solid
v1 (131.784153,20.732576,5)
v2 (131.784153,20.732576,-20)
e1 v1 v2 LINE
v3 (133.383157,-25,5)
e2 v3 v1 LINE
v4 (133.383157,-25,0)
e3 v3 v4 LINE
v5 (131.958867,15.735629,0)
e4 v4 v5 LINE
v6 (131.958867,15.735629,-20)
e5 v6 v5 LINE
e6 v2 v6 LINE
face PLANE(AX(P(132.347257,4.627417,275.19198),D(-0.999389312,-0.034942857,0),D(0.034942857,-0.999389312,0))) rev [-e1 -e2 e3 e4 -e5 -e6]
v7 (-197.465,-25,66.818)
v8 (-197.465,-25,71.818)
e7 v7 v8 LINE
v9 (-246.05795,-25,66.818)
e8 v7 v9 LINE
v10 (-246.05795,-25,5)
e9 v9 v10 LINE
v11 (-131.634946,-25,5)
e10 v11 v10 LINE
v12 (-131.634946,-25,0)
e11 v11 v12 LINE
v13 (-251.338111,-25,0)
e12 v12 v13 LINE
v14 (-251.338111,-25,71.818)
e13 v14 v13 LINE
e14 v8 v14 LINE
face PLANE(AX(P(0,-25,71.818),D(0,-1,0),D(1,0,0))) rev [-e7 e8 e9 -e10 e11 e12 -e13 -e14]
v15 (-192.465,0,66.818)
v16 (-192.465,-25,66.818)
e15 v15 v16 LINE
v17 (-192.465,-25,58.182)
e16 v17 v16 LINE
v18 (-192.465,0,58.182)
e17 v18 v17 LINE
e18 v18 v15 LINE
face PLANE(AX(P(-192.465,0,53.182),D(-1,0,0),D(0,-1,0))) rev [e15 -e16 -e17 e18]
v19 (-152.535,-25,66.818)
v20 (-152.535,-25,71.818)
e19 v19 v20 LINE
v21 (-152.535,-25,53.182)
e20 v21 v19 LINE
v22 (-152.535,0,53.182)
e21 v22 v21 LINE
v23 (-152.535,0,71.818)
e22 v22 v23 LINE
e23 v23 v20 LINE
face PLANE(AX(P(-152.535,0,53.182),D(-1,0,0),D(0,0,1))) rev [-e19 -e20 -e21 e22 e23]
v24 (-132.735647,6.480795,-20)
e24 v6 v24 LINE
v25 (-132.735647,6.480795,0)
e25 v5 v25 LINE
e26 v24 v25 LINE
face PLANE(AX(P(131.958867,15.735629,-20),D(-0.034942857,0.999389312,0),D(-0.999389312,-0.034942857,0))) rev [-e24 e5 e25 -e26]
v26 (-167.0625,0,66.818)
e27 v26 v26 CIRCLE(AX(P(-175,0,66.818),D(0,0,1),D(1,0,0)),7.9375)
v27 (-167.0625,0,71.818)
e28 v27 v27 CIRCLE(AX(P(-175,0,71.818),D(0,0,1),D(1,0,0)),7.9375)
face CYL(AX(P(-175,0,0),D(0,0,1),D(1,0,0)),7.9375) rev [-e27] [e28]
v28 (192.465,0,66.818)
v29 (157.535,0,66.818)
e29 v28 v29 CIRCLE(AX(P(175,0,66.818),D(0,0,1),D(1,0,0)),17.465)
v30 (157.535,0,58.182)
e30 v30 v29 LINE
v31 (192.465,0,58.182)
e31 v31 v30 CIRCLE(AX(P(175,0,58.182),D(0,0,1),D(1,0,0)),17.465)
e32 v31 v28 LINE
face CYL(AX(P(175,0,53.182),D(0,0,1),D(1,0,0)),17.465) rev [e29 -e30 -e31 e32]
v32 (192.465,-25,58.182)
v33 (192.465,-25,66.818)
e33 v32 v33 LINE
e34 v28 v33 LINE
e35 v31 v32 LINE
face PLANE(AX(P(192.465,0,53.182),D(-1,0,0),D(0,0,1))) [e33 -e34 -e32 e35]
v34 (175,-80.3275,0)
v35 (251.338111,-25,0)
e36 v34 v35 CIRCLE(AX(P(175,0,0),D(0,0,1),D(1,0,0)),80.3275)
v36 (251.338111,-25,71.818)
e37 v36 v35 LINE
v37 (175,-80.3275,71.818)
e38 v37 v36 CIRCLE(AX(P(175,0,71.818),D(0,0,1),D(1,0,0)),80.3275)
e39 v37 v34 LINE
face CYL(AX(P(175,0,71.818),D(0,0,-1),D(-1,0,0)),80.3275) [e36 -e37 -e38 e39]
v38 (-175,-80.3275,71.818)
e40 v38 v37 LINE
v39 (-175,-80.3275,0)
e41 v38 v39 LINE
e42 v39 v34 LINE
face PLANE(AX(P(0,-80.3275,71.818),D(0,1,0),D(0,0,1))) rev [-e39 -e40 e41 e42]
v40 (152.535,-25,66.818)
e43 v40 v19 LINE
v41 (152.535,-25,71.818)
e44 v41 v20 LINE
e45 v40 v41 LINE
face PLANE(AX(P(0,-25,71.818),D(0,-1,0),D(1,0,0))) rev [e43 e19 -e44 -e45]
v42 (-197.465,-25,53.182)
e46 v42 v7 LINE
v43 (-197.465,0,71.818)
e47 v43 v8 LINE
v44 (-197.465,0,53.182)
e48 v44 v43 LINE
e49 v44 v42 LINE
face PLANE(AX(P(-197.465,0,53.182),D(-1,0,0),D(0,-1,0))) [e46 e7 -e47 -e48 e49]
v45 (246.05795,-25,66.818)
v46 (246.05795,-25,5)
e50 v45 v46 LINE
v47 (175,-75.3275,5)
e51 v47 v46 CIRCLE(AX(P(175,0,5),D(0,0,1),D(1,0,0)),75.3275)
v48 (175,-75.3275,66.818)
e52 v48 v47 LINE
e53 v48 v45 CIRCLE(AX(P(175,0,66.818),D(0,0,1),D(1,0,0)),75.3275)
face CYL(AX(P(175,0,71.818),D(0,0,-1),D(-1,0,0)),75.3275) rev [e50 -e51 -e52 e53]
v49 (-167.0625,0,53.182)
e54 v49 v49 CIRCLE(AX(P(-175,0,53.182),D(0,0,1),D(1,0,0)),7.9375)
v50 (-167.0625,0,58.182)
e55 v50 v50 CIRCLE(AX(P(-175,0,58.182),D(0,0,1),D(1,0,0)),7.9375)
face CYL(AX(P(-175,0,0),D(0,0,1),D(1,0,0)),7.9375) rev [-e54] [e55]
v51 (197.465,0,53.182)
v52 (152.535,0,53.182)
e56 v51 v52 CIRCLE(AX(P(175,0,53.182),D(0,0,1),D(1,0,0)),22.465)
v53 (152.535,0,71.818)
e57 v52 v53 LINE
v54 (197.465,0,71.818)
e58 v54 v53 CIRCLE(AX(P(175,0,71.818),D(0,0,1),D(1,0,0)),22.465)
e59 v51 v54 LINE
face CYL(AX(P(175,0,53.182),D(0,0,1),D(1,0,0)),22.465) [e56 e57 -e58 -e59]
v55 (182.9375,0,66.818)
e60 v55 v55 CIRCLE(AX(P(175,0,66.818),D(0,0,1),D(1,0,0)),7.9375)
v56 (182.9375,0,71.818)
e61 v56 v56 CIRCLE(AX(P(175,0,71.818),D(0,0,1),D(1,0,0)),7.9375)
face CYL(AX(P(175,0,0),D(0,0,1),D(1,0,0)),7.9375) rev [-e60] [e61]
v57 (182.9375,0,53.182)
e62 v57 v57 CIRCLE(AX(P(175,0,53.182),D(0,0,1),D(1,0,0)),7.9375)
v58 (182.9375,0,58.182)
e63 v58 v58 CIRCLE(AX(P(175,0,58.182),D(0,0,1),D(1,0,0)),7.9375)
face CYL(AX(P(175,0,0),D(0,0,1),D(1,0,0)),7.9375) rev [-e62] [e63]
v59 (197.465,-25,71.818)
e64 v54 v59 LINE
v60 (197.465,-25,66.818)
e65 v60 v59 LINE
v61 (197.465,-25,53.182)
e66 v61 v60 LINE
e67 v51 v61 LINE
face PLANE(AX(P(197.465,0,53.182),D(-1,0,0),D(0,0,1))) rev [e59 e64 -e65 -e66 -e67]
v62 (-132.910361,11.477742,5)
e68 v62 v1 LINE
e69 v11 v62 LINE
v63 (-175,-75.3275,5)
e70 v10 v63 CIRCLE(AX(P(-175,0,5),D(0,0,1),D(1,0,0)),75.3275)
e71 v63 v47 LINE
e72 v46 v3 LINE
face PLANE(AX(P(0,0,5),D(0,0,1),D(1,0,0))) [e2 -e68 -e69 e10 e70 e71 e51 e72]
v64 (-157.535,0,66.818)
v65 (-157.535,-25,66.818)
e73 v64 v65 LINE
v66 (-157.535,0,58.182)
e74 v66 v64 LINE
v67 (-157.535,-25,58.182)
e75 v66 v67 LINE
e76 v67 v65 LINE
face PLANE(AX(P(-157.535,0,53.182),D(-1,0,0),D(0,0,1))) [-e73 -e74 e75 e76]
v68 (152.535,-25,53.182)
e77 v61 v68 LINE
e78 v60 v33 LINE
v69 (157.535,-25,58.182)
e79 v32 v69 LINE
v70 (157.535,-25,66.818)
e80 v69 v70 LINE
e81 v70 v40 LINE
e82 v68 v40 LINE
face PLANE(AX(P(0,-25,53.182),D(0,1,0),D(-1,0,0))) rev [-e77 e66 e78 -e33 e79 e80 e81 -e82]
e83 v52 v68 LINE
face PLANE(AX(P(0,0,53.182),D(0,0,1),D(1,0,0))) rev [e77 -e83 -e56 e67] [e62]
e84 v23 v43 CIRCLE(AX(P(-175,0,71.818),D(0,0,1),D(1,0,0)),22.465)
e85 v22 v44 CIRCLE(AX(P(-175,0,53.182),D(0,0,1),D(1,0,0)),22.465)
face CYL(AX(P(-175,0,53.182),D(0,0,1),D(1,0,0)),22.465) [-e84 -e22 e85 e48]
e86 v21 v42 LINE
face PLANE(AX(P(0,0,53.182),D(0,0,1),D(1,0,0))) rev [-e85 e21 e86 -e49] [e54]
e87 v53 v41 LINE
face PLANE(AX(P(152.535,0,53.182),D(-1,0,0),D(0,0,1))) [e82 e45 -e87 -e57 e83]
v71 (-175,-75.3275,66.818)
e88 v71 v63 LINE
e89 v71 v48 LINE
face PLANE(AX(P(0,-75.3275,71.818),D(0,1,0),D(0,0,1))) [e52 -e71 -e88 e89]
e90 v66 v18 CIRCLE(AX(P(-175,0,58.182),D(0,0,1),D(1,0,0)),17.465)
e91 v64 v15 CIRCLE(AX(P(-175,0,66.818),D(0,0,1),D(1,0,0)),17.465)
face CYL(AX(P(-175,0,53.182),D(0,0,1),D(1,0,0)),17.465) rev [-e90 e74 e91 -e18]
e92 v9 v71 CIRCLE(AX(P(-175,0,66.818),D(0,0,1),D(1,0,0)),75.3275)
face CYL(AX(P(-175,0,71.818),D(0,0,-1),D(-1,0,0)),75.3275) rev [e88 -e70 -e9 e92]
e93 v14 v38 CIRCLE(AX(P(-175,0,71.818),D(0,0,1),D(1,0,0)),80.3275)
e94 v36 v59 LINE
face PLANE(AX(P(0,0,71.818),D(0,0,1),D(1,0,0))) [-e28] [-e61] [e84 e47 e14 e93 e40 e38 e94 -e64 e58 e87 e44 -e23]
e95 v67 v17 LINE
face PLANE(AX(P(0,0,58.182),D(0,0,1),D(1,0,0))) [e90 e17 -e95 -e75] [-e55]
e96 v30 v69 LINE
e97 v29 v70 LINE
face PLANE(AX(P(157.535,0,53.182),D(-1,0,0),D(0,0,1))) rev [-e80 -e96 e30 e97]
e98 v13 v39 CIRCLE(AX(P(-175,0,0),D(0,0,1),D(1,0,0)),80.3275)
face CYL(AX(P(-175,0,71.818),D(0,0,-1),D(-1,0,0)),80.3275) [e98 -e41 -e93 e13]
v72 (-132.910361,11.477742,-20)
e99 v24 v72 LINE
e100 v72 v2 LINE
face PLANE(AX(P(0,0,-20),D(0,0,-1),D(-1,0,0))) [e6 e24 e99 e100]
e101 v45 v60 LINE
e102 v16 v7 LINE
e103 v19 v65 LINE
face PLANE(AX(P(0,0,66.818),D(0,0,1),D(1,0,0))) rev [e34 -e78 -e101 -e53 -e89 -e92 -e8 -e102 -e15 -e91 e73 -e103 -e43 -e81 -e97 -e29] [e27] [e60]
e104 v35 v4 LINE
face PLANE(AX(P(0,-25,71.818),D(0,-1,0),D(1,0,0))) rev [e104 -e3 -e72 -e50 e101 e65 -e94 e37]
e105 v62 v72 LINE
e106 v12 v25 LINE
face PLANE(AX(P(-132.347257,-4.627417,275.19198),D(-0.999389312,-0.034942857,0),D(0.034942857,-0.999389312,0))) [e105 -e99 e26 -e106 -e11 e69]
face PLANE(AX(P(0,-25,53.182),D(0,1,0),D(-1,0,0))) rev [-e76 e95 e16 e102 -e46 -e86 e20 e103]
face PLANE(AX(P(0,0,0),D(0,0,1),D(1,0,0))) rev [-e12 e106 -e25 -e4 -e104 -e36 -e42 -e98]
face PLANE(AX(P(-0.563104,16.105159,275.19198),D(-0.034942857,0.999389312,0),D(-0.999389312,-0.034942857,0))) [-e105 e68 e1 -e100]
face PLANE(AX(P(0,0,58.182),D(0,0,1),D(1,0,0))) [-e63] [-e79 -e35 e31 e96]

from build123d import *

# Parameters (mm, degrees)
BOSS_EXTRUDE7_DEPTH = 71.818
SHELL8_START        = 5
SHELL8_DEPTH        = 61.818
BOSS_EXTRUDE4_DEPTH = 18.636
SHELL7_START        = 58.182
SHELL7_DEPTH        = 8.636
SKETCH5_R           = 7.9375
CUT_EXTRUDE1_DEPTH  = 274.461475598
BOSS_EXTRUDE5_DEPTH = 5
BOSS_EXTRUDE6_DEPTH = 20


# Read off the part's stored shape, not the designer's step: Shell8, Shell7
with BuildPart() as part:
    # Sketch3 → Boss-Extrude7 (new body)
    with BuildSketch(Plane.XY):
        with BuildLine():
            ThreePointArc((-251.338111427, -25), (-222.139790815, -65.041120671), (-175, -80.3275))
            Line((-175, -80.3275), (175, -80.3275))
            ThreePointArc((175, -80.3275), (222.139790815, -65.041120671), (251.338111427, -25))
            Line((251.338111427, -25), (-251.338111427, -25))
        make_face()
    extrude(amount=BOSS_EXTRUDE7_DEPTH)

    # Shell8 outline → Shell8 (cut)
    with BuildSketch(Plane.XY.offset(SHELL8_START)):
        with BuildLine():
            ThreePointArc((-246.057949986, -25), (-218.537597294, -61.471211783), (-175, -75.3275))
            Line((-175, -75.3275), (175, -75.3275))
            ThreePointArc((175, -75.3275), (218.537597294, -61.471211783), (246.057949986, -25))
            Line((246.057949986, -25), (-246.057949986, -25))
        make_face()
    extrude(amount=SHELL8_DEPTH, mode=Mode.SUBTRACT)

    # Sketch4 → Boss-Extrude4 (add)
    with BuildSketch(Plane.XY.offset(71.818)):
        with BuildLine():
            Line((152.535, -25), (197.465, -25))
            Line((197.465, -25), (197.465, 0))
            ThreePointArc((197.465, 0), (175, 22.465), (152.535, 0))
            Line((152.535, 0), (152.535, -25))
        make_face()
        with BuildLine():
            Line((-197.465, 0), (-197.465, -25))
            Line((-197.465, -25), (-152.535, -25))
            Line((-152.535, -25), (-152.535, 0))
            ThreePointArc((-152.535, 0), (-175, 22.465), (-197.465, 0))
        make_face()
    extrude(amount=-BOSS_EXTRUDE4_DEPTH)

    # Shell7 outline → Shell7 (cut)
    with BuildSketch(Plane.XY.offset(SHELL7_START)):
        with BuildLine():
            Line((192.465, -25), (192.465, 0))
            ThreePointArc((192.465, 0), (175, 17.465), (157.535, 0))
            Line((157.535, 0), (157.535, -25))
            Line((157.535, -25), (192.465, -25))
        make_face()
        with BuildLine():
            ThreePointArc((-157.535, 0), (-175, 17.465), (-192.465, 0))
            Line((-192.465, 0), (-192.465, -25))
            Line((-192.465, -25), (-157.535, -25))
            Line((-157.535, -25), (-157.535, 0))
        make_face()
    extrude(amount=SHELL7_DEPTH, mode=Mode.SUBTRACT)

    # Sketch5 → Cut-Extrude1 (cut, through all)
    with BuildSketch(Plane.XY.offset(71.818)):
        with Locations((175, 0)):
            Circle(SKETCH5_R)
        with Locations((-175, 0)):
            Circle(SKETCH5_R)
    extrude(amount=-CUT_EXTRUDE1_DEPTH, mode=Mode.SUBTRACT)

    # Sketch13 → Boss-Extrude5 (add)
    with BuildSketch(Plane(origin=(0, 0, 0), x_dir=(-1, 0, 0), z_dir=(0, 0, -1))):
        Polygon((131.634946049, -25), (132.910361442, 11.477741548), (-131.784153156, 20.732575975), (-133.383156517, -25), align=None)
    extrude(amount=-BOSS_EXTRUDE5_DEPTH)

    # Sketch14 → Boss-Extrude6 (add)
    with BuildSketch(Plane(origin=(0, 0, 0), x_dir=(-1, 0, 0), z_dir=(0, 0, -1))):
        Polygon((-131.784153156, 20.732575975), (-131.958867442, 15.735629415), (132.735647156, 6.480794988), (132.910361442, 11.477741548), align=None)
    extrude(amount=BOSS_EXTRUDE6_DEPTH)


solid = part.part
